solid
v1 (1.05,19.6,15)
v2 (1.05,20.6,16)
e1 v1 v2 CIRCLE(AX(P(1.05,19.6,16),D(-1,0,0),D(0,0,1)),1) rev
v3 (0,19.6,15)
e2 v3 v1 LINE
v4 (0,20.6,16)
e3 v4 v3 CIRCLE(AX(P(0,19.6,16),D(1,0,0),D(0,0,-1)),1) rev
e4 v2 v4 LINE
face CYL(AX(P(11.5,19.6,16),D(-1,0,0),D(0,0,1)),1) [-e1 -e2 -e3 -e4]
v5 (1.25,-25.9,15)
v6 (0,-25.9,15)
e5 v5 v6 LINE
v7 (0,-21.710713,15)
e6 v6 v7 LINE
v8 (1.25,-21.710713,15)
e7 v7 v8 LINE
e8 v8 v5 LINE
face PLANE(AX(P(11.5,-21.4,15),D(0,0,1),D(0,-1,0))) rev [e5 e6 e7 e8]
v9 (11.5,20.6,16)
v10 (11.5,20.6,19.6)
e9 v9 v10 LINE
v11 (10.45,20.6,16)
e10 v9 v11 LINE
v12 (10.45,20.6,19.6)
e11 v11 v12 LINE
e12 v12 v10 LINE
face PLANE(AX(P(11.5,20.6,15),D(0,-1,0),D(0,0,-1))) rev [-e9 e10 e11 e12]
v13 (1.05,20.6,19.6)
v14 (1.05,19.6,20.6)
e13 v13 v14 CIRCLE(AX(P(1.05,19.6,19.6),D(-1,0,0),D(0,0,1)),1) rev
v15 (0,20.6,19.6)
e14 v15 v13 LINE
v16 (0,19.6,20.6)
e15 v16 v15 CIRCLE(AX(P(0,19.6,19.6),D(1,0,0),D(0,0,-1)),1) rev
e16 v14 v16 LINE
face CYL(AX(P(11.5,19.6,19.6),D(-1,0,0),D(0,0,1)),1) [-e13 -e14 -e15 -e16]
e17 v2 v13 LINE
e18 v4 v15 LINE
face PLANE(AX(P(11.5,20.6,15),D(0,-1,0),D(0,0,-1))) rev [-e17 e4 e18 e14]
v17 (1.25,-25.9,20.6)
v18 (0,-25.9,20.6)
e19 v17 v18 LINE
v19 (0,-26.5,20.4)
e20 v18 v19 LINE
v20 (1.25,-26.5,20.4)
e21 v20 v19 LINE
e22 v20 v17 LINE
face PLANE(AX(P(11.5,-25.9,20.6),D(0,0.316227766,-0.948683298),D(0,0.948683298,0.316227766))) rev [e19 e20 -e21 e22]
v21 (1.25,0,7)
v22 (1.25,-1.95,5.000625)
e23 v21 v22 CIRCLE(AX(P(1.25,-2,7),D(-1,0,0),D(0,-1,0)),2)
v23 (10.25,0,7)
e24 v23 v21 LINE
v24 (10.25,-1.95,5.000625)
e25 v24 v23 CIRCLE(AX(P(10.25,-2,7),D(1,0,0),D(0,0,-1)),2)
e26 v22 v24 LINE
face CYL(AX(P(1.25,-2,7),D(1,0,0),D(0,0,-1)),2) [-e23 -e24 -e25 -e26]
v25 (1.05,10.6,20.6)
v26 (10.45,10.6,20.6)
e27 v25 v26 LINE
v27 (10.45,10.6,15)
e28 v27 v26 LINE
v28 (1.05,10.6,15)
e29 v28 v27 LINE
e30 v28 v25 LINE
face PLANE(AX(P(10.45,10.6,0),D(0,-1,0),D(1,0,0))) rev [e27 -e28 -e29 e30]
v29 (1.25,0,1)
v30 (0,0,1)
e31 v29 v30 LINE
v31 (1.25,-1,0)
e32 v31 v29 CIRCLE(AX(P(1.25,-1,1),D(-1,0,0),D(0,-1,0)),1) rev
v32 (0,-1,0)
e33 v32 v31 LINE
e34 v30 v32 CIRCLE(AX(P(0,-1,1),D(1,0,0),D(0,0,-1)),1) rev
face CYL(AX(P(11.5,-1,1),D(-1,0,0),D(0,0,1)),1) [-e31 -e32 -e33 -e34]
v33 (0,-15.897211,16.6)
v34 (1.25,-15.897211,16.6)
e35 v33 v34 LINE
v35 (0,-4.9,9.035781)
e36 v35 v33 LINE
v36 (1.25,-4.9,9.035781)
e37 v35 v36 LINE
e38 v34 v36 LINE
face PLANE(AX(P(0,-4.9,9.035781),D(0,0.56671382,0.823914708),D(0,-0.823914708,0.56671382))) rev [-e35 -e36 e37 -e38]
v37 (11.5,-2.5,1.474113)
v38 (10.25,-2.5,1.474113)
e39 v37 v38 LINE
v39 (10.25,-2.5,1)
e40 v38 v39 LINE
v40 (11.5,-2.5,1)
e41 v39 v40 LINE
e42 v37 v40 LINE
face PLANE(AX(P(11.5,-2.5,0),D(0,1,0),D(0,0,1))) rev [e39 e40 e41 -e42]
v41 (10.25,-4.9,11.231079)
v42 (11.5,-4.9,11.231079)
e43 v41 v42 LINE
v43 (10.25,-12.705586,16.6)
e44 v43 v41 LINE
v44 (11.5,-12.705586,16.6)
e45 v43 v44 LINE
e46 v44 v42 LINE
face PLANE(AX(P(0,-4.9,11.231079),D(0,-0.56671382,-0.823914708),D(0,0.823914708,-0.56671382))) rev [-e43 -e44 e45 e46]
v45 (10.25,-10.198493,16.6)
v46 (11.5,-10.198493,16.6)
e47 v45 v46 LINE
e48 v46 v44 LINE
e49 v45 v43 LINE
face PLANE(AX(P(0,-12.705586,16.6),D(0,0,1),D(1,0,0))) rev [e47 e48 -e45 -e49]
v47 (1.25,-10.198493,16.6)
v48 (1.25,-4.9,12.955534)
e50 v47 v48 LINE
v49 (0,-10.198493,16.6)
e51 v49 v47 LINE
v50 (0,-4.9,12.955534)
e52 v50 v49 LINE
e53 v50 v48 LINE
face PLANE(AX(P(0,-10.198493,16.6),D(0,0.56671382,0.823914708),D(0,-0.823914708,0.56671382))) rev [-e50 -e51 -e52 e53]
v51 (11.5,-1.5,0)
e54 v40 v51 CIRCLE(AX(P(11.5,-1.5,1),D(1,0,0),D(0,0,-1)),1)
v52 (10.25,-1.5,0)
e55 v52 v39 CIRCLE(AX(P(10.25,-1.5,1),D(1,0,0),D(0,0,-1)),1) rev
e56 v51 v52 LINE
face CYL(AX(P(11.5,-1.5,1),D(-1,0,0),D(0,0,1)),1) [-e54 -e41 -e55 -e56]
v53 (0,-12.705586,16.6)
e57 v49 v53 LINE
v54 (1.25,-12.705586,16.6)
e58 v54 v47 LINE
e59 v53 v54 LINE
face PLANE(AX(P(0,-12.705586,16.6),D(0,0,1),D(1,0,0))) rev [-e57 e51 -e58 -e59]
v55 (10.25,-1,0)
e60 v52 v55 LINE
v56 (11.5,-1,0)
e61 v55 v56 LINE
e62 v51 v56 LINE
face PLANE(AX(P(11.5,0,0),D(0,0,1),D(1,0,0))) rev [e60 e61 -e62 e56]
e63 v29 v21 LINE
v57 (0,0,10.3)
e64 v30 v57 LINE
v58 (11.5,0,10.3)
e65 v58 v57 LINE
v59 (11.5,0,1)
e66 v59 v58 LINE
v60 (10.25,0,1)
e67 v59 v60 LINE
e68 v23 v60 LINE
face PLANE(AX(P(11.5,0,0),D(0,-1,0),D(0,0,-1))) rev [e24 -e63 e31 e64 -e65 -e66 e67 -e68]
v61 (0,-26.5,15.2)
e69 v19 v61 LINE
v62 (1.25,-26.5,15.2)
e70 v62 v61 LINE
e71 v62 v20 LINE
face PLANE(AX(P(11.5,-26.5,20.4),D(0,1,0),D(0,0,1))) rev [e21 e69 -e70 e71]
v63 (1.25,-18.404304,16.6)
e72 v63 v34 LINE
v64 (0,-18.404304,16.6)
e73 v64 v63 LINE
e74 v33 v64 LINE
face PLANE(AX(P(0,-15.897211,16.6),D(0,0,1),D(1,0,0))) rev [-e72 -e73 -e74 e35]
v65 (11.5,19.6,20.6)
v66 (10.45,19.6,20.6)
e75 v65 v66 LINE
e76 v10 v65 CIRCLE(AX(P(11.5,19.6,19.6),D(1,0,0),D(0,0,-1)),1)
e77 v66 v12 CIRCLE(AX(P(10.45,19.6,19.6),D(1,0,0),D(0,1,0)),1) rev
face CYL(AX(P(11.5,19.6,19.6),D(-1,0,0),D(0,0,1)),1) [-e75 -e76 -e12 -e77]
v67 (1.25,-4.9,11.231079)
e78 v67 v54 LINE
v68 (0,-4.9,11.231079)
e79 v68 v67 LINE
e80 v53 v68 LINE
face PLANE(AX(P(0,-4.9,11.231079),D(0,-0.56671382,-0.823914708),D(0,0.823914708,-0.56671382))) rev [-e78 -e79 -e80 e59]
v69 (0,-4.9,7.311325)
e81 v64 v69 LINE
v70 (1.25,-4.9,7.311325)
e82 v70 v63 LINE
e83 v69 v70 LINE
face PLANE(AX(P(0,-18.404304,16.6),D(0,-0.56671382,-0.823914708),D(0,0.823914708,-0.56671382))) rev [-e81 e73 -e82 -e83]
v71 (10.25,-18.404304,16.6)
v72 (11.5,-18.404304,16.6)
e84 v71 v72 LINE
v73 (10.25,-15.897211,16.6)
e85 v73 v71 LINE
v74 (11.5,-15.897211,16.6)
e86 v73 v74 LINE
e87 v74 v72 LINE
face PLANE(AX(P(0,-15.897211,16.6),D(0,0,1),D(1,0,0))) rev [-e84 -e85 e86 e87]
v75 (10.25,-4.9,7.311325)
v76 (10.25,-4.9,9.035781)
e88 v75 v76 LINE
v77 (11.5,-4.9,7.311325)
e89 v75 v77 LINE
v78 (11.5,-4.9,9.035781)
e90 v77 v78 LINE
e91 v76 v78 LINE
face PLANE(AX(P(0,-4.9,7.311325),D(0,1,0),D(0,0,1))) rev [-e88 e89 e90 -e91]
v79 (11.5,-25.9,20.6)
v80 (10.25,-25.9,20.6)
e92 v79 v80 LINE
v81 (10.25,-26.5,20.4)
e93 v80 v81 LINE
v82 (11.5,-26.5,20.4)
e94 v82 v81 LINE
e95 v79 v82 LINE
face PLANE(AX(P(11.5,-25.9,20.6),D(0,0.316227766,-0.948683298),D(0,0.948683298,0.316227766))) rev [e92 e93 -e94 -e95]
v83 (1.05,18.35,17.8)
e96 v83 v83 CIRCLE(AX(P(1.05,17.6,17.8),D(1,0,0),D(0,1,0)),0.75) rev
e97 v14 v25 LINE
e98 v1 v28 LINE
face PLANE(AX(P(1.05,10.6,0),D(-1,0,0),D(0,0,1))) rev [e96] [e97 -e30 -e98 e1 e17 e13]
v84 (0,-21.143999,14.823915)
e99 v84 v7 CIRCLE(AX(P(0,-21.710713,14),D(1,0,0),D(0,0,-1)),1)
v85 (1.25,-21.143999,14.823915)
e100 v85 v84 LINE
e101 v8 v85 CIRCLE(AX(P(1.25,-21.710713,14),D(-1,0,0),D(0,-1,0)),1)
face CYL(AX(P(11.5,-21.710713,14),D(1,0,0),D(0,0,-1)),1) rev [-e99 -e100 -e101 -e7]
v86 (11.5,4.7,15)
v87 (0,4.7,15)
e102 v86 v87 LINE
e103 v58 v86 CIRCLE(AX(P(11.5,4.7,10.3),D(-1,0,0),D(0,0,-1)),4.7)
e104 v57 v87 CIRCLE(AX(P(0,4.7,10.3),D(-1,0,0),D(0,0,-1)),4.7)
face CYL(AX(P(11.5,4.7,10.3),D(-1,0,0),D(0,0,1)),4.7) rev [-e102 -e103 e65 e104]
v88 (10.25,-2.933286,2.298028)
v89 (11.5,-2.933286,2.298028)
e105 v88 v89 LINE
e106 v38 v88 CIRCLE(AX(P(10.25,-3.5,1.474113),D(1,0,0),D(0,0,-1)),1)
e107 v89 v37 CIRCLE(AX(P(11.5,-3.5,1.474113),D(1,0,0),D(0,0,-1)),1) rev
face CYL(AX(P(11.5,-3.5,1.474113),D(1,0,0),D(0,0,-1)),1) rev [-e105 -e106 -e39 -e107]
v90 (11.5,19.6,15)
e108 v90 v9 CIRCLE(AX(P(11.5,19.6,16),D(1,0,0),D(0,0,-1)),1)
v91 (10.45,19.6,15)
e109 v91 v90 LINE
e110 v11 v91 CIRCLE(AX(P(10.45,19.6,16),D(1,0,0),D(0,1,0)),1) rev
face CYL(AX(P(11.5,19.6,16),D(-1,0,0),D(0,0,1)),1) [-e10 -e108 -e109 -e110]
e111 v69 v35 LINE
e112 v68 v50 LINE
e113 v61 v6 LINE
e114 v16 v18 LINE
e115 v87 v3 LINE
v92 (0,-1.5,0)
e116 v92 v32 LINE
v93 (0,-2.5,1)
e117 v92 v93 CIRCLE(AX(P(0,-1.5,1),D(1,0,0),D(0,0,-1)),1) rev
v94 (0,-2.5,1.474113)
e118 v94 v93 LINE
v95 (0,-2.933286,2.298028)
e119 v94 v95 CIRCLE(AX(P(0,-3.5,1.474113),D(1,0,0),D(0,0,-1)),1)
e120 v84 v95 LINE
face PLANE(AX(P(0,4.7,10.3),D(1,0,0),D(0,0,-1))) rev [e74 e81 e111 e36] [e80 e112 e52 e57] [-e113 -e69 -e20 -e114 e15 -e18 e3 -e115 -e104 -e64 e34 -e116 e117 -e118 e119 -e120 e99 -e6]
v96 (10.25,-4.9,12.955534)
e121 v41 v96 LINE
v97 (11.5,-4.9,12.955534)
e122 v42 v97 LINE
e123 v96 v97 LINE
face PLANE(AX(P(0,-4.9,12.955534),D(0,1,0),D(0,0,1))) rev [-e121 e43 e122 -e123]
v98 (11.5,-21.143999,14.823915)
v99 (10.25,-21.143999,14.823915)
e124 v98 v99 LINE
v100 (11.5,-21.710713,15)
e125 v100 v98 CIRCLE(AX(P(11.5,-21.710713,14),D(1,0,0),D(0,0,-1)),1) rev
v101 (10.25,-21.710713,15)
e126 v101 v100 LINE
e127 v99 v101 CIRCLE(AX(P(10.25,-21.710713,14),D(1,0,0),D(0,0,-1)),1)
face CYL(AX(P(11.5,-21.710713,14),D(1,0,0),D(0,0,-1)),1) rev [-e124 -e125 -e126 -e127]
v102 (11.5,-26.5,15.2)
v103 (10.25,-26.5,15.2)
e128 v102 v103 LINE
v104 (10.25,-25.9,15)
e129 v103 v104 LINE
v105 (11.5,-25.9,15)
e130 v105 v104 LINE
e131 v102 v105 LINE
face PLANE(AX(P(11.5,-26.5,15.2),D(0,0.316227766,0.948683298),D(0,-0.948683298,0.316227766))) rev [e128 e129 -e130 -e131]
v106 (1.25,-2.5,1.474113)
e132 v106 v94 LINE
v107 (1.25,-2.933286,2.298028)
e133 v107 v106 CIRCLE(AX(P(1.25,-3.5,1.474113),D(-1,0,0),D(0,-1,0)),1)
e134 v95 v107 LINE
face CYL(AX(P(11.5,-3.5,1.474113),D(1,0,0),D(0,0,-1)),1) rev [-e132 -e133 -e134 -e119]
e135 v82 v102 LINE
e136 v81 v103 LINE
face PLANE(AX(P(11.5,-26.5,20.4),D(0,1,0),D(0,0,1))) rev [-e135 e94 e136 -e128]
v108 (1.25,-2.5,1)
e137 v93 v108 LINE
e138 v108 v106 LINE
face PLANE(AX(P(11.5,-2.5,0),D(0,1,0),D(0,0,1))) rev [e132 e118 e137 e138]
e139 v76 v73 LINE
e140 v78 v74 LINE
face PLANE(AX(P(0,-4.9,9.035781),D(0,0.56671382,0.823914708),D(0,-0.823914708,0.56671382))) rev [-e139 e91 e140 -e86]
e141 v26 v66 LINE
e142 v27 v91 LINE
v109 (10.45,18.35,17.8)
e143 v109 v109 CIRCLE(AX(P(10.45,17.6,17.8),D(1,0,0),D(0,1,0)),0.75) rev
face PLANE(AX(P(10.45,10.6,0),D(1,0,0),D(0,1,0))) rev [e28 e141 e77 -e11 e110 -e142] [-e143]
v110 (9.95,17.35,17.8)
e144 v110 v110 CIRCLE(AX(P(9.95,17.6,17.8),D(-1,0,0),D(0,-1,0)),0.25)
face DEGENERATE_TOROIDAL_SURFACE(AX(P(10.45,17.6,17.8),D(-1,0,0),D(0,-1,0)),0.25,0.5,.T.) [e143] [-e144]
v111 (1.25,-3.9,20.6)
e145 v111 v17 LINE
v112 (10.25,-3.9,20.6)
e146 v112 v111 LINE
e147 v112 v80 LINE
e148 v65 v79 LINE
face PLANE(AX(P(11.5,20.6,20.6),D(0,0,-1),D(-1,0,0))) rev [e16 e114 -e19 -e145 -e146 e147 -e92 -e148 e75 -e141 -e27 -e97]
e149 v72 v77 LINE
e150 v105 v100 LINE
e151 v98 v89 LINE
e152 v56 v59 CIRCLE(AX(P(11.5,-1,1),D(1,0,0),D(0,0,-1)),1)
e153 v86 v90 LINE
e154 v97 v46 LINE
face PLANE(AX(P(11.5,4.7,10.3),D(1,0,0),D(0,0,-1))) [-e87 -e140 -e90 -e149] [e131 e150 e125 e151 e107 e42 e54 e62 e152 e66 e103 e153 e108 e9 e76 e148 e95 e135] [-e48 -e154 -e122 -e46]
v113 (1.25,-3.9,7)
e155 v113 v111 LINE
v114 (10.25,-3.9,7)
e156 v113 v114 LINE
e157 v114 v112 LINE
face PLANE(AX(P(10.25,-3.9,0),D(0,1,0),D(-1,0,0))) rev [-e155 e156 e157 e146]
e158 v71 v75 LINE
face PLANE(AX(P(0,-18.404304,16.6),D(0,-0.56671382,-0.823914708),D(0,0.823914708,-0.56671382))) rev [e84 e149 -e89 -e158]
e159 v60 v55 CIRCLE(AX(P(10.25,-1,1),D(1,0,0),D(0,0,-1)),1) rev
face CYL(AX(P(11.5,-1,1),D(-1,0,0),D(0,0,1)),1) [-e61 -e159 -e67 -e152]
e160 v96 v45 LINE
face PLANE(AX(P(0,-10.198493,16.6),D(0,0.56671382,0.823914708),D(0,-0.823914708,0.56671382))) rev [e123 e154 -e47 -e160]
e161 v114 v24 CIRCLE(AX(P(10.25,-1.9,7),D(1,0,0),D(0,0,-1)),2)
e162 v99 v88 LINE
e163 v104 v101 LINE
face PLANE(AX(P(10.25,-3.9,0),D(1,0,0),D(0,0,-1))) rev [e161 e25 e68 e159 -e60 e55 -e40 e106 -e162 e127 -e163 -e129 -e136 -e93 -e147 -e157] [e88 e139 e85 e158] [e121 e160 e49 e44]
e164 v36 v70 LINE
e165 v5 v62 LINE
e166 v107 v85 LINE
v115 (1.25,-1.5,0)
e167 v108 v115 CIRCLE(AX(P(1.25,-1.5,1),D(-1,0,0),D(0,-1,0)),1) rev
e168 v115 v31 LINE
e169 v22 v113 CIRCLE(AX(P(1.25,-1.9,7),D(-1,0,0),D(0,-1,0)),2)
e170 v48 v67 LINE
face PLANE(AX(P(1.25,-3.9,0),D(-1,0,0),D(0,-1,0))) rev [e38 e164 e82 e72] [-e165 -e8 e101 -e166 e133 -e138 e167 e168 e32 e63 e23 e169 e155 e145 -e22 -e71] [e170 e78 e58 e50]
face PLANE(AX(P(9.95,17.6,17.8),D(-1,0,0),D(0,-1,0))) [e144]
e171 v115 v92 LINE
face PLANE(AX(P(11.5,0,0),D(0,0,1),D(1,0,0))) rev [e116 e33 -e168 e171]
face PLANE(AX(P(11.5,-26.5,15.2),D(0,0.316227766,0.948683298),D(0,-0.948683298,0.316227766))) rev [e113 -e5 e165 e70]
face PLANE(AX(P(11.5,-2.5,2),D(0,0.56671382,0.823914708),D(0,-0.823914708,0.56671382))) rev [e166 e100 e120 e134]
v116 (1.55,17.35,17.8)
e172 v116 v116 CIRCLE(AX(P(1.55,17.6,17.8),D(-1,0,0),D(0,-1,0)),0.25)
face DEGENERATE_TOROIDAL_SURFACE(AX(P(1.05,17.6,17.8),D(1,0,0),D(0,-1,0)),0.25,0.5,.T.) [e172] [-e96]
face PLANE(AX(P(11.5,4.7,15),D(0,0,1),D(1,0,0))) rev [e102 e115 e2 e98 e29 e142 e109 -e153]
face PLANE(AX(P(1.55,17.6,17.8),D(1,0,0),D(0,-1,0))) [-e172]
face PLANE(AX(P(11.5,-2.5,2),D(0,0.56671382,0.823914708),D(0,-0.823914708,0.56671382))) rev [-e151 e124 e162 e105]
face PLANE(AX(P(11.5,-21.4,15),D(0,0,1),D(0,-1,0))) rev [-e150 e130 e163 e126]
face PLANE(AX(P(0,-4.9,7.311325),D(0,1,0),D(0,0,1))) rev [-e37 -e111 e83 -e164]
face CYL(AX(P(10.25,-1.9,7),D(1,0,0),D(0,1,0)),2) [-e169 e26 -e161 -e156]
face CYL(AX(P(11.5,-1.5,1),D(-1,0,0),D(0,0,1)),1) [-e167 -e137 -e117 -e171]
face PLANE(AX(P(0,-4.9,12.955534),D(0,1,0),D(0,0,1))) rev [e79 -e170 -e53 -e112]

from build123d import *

# Parameters (mm, degrees)
DODANIE_WYCI_GNI_CIE1_DEPTH     = 11.5
SZKIC2_W                        = 9.4
SZKIC2_H                        = 10
SZKIC2_W_2                      = 9
SZKIC2_H_2                      = 24.370303929
WYTNIJ_WYCI_GNI_CIE1_DEPTH      = 36.480417134
WYTNIJ_WYCI_GNI_CIE2_DEPTH      = 36.480417134
WYTNIJ_WYCI_GNI_CIE2_DEPTH_BACK = 36.480417134
SZKIC4_W                        = 9
SZKIC4_H                        = 5
WYTNIJ_WYCI_GNI_CIE3_DEPTH      = 10
ZAOKR_GLENIE1_R                 = 2
ZAOKR_GLENIE2_R                 = 1
SZKIC5_R                        = 0.75
DODANIE_WYCI_GNI_CIE2_DEPTH     = 0.5
ZAOKR_GLENIE3_R                 = 0.5


# Some blends are built 0.0001 mm under size
with BuildPart() as part:
    # Szkic1 → Dodanie-wyciągnięcie1 (new body)
    with BuildSketch(Plane(origin=(0, 0, 0), x_dir=(0, 0, -1), z_dir=(1, 0, 0))):
        with BuildLine():
            Line((0, 0), (-10.3, 0))
            ThreePointArc((-10.3, 0), (-13.623401872, 1.376598128), (-15, 4.7))
            Line((-15, 4.7), (-15, 20.6))
            Line((-15, 20.6), (-20.6, 20.6))
            Line((-20.6, 20.6), (-20.6, -21.4))
            Line((-20.6, -21.4), (-20.6, -25.9))
            Line((-20.6, -25.9), (-20.4, -26.5))
            Line((-20.4, -26.5), (-15.2, -26.5))
            Line((-15.2, -26.5), (-15, -25.9))
            Line((-15, -25.9), (-15, -21.4))
            Line((-15, -21.4), (-2, -2.5))
            Line((-2, -2.5), (0, -2.5))
            Line((0, -2.5), (0, 0))
        make_face()
    extrude(amount=DODANIE_WYCI_GNI_CIE1_DEPTH)

    # Szkic2 → Wytnij-wyciągnięcie1 (cut, through all)
    with BuildSketch(Plane.XY.offset(20.6)):
        with Locations((5.75, 15.6)):
            Rectangle(SZKIC2_W, SZKIC2_H)
        with Locations((5.75, -16.085151964)):
            Rectangle(SZKIC2_W_2, SZKIC2_H_2)
    extrude(amount=-WYTNIJ_WYCI_GNI_CIE1_DEPTH, mode=Mode.SUBTRACT)

    # Szkic3 → Wytnij-wyciągnięcie2 (cut, two sides: drawn at the far end of the back side and taken through both)
    with BuildSketch(Plane(origin=(11.5, 0, 0), x_dir=(0, 0, -1), z_dir=(1, 0, 0)).offset(-WYTNIJ_WYCI_GNI_CIE2_DEPTH_BACK)):
        Polygon((-16.6, -12.705585851), (-16.6, -10.198492794), (-12.955534057, -4.9), (-11.231078515, -4.9), align=None)
        Polygon((-16.6, -15.897210923), (-16.6, -18.40430398), (-7.311325305, -4.9), (-9.035780847, -4.9), align=None)
    extrude(amount=WYTNIJ_WYCI_GNI_CIE2_DEPTH + WYTNIJ_WYCI_GNI_CIE2_DEPTH_BACK, mode=Mode.SUBTRACT)

    # Szkic4 → Wytnij-wyciągnięcie3 (cut)
    with BuildSketch(Plane(origin=(0, 0, 0), x_dir=(1, 0, 0), z_dir=(0, 1, 0))):
        with Locations((5.75, -2.5)):
            Rectangle(SZKIC4_W, SZKIC4_H)
    extrude(amount=-WYTNIJ_WYCI_GNI_CIE3_DEPTH, mode=Mode.SUBTRACT)

    # Zaokrąglenie1
    # the kernel refuses this fillet: 2 mm, written as the material it takes off along each edge
    with BuildSketch(Plane(origin=(1.25, -3.9, 5), x_dir=(0, 0, 1), z_dir=(1, 0, 0))) as zaokr_glenie1_piece_1:
        with BuildLine():
            CenterArc((ZAOKR_GLENIE1_R, -ZAOKR_GLENIE1_R), ZAOKR_GLENIE1_R, 90, 90)
            Line((0, -ZAOKR_GLENIE1_R), (0, 0))
            Line((0, 0), (ZAOKR_GLENIE1_R, 0))
        make_face()
    extrude(amount=9, mode=Mode.SUBTRACT)
    with BuildSketch(Plane(origin=(1.25, 0, 5), x_dir=(0, 0, 1), z_dir=(1, 0, 0))) as zaokr_glenie1_piece_2:
        with BuildLine():
            CenterArc((ZAOKR_GLENIE1_R, ZAOKR_GLENIE1_R), ZAOKR_GLENIE1_R, 180, 90)
            Line((0, ZAOKR_GLENIE1_R), (0, 0))
            Line((0, 0), (ZAOKR_GLENIE1_R, 0))
        make_face()
    extrude(amount=9, mode=Mode.SUBTRACT)

    # Zaokrąglenie2
    zaokr_glenie2_edges = [part.edges().sort_by_distance(p)[0] for p in [
        (0.625, 0, 0),
        (0.625, -2.5, 0),
        (0.625, -2.5, 2),
        (10.975, 20.6, 20.6),
        (10.975, 20.6, 15),
        (10.875, 0, 0),
        (10.875, -2.5, 0),
        (10.875, -2.5, 2),
        (10.875, -21.4, 15),
        (0.525, 20.6, 20.6),
        (0.525, 20.6, 15),
        (0.625, -21.4, 15),
    ]]
    fillet(zaokr_glenie2_edges, radius=ZAOKR_GLENIE2_R)

    # Szkic5 → Dodanie-wyciągnięcie2 (add)
    with BuildSketch(Plane.ZY.offset(-10.45)):
        with Locations(Location((17.8, 17.6, 0), (0, 0, 90))):
            Circle(SZKIC5_R)
    extrude(amount=DODANIE_WYCI_GNI_CIE2_DEPTH)

    # Zaokrąglenie3
    zaokr_glenie3_edges = [part.edges().sort_by_distance(p)[0] for p in [
        (9.95, 16.85, 17.8),
    ]]
    fillet(zaokr_glenie3_edges, radius=ZAOKR_GLENIE3_R - 0.0001)  # a hair under: the kernel refuses the full size

    # Lustro2: part across plane


with BuildPart() as part_1:
    add(part.part)
    add(part.part.mirror(Plane(origin=(5.75, 0, 0), x_dir=(0, 0, 1), z_dir=(1, 0, 0))))


solid = part_1.part
